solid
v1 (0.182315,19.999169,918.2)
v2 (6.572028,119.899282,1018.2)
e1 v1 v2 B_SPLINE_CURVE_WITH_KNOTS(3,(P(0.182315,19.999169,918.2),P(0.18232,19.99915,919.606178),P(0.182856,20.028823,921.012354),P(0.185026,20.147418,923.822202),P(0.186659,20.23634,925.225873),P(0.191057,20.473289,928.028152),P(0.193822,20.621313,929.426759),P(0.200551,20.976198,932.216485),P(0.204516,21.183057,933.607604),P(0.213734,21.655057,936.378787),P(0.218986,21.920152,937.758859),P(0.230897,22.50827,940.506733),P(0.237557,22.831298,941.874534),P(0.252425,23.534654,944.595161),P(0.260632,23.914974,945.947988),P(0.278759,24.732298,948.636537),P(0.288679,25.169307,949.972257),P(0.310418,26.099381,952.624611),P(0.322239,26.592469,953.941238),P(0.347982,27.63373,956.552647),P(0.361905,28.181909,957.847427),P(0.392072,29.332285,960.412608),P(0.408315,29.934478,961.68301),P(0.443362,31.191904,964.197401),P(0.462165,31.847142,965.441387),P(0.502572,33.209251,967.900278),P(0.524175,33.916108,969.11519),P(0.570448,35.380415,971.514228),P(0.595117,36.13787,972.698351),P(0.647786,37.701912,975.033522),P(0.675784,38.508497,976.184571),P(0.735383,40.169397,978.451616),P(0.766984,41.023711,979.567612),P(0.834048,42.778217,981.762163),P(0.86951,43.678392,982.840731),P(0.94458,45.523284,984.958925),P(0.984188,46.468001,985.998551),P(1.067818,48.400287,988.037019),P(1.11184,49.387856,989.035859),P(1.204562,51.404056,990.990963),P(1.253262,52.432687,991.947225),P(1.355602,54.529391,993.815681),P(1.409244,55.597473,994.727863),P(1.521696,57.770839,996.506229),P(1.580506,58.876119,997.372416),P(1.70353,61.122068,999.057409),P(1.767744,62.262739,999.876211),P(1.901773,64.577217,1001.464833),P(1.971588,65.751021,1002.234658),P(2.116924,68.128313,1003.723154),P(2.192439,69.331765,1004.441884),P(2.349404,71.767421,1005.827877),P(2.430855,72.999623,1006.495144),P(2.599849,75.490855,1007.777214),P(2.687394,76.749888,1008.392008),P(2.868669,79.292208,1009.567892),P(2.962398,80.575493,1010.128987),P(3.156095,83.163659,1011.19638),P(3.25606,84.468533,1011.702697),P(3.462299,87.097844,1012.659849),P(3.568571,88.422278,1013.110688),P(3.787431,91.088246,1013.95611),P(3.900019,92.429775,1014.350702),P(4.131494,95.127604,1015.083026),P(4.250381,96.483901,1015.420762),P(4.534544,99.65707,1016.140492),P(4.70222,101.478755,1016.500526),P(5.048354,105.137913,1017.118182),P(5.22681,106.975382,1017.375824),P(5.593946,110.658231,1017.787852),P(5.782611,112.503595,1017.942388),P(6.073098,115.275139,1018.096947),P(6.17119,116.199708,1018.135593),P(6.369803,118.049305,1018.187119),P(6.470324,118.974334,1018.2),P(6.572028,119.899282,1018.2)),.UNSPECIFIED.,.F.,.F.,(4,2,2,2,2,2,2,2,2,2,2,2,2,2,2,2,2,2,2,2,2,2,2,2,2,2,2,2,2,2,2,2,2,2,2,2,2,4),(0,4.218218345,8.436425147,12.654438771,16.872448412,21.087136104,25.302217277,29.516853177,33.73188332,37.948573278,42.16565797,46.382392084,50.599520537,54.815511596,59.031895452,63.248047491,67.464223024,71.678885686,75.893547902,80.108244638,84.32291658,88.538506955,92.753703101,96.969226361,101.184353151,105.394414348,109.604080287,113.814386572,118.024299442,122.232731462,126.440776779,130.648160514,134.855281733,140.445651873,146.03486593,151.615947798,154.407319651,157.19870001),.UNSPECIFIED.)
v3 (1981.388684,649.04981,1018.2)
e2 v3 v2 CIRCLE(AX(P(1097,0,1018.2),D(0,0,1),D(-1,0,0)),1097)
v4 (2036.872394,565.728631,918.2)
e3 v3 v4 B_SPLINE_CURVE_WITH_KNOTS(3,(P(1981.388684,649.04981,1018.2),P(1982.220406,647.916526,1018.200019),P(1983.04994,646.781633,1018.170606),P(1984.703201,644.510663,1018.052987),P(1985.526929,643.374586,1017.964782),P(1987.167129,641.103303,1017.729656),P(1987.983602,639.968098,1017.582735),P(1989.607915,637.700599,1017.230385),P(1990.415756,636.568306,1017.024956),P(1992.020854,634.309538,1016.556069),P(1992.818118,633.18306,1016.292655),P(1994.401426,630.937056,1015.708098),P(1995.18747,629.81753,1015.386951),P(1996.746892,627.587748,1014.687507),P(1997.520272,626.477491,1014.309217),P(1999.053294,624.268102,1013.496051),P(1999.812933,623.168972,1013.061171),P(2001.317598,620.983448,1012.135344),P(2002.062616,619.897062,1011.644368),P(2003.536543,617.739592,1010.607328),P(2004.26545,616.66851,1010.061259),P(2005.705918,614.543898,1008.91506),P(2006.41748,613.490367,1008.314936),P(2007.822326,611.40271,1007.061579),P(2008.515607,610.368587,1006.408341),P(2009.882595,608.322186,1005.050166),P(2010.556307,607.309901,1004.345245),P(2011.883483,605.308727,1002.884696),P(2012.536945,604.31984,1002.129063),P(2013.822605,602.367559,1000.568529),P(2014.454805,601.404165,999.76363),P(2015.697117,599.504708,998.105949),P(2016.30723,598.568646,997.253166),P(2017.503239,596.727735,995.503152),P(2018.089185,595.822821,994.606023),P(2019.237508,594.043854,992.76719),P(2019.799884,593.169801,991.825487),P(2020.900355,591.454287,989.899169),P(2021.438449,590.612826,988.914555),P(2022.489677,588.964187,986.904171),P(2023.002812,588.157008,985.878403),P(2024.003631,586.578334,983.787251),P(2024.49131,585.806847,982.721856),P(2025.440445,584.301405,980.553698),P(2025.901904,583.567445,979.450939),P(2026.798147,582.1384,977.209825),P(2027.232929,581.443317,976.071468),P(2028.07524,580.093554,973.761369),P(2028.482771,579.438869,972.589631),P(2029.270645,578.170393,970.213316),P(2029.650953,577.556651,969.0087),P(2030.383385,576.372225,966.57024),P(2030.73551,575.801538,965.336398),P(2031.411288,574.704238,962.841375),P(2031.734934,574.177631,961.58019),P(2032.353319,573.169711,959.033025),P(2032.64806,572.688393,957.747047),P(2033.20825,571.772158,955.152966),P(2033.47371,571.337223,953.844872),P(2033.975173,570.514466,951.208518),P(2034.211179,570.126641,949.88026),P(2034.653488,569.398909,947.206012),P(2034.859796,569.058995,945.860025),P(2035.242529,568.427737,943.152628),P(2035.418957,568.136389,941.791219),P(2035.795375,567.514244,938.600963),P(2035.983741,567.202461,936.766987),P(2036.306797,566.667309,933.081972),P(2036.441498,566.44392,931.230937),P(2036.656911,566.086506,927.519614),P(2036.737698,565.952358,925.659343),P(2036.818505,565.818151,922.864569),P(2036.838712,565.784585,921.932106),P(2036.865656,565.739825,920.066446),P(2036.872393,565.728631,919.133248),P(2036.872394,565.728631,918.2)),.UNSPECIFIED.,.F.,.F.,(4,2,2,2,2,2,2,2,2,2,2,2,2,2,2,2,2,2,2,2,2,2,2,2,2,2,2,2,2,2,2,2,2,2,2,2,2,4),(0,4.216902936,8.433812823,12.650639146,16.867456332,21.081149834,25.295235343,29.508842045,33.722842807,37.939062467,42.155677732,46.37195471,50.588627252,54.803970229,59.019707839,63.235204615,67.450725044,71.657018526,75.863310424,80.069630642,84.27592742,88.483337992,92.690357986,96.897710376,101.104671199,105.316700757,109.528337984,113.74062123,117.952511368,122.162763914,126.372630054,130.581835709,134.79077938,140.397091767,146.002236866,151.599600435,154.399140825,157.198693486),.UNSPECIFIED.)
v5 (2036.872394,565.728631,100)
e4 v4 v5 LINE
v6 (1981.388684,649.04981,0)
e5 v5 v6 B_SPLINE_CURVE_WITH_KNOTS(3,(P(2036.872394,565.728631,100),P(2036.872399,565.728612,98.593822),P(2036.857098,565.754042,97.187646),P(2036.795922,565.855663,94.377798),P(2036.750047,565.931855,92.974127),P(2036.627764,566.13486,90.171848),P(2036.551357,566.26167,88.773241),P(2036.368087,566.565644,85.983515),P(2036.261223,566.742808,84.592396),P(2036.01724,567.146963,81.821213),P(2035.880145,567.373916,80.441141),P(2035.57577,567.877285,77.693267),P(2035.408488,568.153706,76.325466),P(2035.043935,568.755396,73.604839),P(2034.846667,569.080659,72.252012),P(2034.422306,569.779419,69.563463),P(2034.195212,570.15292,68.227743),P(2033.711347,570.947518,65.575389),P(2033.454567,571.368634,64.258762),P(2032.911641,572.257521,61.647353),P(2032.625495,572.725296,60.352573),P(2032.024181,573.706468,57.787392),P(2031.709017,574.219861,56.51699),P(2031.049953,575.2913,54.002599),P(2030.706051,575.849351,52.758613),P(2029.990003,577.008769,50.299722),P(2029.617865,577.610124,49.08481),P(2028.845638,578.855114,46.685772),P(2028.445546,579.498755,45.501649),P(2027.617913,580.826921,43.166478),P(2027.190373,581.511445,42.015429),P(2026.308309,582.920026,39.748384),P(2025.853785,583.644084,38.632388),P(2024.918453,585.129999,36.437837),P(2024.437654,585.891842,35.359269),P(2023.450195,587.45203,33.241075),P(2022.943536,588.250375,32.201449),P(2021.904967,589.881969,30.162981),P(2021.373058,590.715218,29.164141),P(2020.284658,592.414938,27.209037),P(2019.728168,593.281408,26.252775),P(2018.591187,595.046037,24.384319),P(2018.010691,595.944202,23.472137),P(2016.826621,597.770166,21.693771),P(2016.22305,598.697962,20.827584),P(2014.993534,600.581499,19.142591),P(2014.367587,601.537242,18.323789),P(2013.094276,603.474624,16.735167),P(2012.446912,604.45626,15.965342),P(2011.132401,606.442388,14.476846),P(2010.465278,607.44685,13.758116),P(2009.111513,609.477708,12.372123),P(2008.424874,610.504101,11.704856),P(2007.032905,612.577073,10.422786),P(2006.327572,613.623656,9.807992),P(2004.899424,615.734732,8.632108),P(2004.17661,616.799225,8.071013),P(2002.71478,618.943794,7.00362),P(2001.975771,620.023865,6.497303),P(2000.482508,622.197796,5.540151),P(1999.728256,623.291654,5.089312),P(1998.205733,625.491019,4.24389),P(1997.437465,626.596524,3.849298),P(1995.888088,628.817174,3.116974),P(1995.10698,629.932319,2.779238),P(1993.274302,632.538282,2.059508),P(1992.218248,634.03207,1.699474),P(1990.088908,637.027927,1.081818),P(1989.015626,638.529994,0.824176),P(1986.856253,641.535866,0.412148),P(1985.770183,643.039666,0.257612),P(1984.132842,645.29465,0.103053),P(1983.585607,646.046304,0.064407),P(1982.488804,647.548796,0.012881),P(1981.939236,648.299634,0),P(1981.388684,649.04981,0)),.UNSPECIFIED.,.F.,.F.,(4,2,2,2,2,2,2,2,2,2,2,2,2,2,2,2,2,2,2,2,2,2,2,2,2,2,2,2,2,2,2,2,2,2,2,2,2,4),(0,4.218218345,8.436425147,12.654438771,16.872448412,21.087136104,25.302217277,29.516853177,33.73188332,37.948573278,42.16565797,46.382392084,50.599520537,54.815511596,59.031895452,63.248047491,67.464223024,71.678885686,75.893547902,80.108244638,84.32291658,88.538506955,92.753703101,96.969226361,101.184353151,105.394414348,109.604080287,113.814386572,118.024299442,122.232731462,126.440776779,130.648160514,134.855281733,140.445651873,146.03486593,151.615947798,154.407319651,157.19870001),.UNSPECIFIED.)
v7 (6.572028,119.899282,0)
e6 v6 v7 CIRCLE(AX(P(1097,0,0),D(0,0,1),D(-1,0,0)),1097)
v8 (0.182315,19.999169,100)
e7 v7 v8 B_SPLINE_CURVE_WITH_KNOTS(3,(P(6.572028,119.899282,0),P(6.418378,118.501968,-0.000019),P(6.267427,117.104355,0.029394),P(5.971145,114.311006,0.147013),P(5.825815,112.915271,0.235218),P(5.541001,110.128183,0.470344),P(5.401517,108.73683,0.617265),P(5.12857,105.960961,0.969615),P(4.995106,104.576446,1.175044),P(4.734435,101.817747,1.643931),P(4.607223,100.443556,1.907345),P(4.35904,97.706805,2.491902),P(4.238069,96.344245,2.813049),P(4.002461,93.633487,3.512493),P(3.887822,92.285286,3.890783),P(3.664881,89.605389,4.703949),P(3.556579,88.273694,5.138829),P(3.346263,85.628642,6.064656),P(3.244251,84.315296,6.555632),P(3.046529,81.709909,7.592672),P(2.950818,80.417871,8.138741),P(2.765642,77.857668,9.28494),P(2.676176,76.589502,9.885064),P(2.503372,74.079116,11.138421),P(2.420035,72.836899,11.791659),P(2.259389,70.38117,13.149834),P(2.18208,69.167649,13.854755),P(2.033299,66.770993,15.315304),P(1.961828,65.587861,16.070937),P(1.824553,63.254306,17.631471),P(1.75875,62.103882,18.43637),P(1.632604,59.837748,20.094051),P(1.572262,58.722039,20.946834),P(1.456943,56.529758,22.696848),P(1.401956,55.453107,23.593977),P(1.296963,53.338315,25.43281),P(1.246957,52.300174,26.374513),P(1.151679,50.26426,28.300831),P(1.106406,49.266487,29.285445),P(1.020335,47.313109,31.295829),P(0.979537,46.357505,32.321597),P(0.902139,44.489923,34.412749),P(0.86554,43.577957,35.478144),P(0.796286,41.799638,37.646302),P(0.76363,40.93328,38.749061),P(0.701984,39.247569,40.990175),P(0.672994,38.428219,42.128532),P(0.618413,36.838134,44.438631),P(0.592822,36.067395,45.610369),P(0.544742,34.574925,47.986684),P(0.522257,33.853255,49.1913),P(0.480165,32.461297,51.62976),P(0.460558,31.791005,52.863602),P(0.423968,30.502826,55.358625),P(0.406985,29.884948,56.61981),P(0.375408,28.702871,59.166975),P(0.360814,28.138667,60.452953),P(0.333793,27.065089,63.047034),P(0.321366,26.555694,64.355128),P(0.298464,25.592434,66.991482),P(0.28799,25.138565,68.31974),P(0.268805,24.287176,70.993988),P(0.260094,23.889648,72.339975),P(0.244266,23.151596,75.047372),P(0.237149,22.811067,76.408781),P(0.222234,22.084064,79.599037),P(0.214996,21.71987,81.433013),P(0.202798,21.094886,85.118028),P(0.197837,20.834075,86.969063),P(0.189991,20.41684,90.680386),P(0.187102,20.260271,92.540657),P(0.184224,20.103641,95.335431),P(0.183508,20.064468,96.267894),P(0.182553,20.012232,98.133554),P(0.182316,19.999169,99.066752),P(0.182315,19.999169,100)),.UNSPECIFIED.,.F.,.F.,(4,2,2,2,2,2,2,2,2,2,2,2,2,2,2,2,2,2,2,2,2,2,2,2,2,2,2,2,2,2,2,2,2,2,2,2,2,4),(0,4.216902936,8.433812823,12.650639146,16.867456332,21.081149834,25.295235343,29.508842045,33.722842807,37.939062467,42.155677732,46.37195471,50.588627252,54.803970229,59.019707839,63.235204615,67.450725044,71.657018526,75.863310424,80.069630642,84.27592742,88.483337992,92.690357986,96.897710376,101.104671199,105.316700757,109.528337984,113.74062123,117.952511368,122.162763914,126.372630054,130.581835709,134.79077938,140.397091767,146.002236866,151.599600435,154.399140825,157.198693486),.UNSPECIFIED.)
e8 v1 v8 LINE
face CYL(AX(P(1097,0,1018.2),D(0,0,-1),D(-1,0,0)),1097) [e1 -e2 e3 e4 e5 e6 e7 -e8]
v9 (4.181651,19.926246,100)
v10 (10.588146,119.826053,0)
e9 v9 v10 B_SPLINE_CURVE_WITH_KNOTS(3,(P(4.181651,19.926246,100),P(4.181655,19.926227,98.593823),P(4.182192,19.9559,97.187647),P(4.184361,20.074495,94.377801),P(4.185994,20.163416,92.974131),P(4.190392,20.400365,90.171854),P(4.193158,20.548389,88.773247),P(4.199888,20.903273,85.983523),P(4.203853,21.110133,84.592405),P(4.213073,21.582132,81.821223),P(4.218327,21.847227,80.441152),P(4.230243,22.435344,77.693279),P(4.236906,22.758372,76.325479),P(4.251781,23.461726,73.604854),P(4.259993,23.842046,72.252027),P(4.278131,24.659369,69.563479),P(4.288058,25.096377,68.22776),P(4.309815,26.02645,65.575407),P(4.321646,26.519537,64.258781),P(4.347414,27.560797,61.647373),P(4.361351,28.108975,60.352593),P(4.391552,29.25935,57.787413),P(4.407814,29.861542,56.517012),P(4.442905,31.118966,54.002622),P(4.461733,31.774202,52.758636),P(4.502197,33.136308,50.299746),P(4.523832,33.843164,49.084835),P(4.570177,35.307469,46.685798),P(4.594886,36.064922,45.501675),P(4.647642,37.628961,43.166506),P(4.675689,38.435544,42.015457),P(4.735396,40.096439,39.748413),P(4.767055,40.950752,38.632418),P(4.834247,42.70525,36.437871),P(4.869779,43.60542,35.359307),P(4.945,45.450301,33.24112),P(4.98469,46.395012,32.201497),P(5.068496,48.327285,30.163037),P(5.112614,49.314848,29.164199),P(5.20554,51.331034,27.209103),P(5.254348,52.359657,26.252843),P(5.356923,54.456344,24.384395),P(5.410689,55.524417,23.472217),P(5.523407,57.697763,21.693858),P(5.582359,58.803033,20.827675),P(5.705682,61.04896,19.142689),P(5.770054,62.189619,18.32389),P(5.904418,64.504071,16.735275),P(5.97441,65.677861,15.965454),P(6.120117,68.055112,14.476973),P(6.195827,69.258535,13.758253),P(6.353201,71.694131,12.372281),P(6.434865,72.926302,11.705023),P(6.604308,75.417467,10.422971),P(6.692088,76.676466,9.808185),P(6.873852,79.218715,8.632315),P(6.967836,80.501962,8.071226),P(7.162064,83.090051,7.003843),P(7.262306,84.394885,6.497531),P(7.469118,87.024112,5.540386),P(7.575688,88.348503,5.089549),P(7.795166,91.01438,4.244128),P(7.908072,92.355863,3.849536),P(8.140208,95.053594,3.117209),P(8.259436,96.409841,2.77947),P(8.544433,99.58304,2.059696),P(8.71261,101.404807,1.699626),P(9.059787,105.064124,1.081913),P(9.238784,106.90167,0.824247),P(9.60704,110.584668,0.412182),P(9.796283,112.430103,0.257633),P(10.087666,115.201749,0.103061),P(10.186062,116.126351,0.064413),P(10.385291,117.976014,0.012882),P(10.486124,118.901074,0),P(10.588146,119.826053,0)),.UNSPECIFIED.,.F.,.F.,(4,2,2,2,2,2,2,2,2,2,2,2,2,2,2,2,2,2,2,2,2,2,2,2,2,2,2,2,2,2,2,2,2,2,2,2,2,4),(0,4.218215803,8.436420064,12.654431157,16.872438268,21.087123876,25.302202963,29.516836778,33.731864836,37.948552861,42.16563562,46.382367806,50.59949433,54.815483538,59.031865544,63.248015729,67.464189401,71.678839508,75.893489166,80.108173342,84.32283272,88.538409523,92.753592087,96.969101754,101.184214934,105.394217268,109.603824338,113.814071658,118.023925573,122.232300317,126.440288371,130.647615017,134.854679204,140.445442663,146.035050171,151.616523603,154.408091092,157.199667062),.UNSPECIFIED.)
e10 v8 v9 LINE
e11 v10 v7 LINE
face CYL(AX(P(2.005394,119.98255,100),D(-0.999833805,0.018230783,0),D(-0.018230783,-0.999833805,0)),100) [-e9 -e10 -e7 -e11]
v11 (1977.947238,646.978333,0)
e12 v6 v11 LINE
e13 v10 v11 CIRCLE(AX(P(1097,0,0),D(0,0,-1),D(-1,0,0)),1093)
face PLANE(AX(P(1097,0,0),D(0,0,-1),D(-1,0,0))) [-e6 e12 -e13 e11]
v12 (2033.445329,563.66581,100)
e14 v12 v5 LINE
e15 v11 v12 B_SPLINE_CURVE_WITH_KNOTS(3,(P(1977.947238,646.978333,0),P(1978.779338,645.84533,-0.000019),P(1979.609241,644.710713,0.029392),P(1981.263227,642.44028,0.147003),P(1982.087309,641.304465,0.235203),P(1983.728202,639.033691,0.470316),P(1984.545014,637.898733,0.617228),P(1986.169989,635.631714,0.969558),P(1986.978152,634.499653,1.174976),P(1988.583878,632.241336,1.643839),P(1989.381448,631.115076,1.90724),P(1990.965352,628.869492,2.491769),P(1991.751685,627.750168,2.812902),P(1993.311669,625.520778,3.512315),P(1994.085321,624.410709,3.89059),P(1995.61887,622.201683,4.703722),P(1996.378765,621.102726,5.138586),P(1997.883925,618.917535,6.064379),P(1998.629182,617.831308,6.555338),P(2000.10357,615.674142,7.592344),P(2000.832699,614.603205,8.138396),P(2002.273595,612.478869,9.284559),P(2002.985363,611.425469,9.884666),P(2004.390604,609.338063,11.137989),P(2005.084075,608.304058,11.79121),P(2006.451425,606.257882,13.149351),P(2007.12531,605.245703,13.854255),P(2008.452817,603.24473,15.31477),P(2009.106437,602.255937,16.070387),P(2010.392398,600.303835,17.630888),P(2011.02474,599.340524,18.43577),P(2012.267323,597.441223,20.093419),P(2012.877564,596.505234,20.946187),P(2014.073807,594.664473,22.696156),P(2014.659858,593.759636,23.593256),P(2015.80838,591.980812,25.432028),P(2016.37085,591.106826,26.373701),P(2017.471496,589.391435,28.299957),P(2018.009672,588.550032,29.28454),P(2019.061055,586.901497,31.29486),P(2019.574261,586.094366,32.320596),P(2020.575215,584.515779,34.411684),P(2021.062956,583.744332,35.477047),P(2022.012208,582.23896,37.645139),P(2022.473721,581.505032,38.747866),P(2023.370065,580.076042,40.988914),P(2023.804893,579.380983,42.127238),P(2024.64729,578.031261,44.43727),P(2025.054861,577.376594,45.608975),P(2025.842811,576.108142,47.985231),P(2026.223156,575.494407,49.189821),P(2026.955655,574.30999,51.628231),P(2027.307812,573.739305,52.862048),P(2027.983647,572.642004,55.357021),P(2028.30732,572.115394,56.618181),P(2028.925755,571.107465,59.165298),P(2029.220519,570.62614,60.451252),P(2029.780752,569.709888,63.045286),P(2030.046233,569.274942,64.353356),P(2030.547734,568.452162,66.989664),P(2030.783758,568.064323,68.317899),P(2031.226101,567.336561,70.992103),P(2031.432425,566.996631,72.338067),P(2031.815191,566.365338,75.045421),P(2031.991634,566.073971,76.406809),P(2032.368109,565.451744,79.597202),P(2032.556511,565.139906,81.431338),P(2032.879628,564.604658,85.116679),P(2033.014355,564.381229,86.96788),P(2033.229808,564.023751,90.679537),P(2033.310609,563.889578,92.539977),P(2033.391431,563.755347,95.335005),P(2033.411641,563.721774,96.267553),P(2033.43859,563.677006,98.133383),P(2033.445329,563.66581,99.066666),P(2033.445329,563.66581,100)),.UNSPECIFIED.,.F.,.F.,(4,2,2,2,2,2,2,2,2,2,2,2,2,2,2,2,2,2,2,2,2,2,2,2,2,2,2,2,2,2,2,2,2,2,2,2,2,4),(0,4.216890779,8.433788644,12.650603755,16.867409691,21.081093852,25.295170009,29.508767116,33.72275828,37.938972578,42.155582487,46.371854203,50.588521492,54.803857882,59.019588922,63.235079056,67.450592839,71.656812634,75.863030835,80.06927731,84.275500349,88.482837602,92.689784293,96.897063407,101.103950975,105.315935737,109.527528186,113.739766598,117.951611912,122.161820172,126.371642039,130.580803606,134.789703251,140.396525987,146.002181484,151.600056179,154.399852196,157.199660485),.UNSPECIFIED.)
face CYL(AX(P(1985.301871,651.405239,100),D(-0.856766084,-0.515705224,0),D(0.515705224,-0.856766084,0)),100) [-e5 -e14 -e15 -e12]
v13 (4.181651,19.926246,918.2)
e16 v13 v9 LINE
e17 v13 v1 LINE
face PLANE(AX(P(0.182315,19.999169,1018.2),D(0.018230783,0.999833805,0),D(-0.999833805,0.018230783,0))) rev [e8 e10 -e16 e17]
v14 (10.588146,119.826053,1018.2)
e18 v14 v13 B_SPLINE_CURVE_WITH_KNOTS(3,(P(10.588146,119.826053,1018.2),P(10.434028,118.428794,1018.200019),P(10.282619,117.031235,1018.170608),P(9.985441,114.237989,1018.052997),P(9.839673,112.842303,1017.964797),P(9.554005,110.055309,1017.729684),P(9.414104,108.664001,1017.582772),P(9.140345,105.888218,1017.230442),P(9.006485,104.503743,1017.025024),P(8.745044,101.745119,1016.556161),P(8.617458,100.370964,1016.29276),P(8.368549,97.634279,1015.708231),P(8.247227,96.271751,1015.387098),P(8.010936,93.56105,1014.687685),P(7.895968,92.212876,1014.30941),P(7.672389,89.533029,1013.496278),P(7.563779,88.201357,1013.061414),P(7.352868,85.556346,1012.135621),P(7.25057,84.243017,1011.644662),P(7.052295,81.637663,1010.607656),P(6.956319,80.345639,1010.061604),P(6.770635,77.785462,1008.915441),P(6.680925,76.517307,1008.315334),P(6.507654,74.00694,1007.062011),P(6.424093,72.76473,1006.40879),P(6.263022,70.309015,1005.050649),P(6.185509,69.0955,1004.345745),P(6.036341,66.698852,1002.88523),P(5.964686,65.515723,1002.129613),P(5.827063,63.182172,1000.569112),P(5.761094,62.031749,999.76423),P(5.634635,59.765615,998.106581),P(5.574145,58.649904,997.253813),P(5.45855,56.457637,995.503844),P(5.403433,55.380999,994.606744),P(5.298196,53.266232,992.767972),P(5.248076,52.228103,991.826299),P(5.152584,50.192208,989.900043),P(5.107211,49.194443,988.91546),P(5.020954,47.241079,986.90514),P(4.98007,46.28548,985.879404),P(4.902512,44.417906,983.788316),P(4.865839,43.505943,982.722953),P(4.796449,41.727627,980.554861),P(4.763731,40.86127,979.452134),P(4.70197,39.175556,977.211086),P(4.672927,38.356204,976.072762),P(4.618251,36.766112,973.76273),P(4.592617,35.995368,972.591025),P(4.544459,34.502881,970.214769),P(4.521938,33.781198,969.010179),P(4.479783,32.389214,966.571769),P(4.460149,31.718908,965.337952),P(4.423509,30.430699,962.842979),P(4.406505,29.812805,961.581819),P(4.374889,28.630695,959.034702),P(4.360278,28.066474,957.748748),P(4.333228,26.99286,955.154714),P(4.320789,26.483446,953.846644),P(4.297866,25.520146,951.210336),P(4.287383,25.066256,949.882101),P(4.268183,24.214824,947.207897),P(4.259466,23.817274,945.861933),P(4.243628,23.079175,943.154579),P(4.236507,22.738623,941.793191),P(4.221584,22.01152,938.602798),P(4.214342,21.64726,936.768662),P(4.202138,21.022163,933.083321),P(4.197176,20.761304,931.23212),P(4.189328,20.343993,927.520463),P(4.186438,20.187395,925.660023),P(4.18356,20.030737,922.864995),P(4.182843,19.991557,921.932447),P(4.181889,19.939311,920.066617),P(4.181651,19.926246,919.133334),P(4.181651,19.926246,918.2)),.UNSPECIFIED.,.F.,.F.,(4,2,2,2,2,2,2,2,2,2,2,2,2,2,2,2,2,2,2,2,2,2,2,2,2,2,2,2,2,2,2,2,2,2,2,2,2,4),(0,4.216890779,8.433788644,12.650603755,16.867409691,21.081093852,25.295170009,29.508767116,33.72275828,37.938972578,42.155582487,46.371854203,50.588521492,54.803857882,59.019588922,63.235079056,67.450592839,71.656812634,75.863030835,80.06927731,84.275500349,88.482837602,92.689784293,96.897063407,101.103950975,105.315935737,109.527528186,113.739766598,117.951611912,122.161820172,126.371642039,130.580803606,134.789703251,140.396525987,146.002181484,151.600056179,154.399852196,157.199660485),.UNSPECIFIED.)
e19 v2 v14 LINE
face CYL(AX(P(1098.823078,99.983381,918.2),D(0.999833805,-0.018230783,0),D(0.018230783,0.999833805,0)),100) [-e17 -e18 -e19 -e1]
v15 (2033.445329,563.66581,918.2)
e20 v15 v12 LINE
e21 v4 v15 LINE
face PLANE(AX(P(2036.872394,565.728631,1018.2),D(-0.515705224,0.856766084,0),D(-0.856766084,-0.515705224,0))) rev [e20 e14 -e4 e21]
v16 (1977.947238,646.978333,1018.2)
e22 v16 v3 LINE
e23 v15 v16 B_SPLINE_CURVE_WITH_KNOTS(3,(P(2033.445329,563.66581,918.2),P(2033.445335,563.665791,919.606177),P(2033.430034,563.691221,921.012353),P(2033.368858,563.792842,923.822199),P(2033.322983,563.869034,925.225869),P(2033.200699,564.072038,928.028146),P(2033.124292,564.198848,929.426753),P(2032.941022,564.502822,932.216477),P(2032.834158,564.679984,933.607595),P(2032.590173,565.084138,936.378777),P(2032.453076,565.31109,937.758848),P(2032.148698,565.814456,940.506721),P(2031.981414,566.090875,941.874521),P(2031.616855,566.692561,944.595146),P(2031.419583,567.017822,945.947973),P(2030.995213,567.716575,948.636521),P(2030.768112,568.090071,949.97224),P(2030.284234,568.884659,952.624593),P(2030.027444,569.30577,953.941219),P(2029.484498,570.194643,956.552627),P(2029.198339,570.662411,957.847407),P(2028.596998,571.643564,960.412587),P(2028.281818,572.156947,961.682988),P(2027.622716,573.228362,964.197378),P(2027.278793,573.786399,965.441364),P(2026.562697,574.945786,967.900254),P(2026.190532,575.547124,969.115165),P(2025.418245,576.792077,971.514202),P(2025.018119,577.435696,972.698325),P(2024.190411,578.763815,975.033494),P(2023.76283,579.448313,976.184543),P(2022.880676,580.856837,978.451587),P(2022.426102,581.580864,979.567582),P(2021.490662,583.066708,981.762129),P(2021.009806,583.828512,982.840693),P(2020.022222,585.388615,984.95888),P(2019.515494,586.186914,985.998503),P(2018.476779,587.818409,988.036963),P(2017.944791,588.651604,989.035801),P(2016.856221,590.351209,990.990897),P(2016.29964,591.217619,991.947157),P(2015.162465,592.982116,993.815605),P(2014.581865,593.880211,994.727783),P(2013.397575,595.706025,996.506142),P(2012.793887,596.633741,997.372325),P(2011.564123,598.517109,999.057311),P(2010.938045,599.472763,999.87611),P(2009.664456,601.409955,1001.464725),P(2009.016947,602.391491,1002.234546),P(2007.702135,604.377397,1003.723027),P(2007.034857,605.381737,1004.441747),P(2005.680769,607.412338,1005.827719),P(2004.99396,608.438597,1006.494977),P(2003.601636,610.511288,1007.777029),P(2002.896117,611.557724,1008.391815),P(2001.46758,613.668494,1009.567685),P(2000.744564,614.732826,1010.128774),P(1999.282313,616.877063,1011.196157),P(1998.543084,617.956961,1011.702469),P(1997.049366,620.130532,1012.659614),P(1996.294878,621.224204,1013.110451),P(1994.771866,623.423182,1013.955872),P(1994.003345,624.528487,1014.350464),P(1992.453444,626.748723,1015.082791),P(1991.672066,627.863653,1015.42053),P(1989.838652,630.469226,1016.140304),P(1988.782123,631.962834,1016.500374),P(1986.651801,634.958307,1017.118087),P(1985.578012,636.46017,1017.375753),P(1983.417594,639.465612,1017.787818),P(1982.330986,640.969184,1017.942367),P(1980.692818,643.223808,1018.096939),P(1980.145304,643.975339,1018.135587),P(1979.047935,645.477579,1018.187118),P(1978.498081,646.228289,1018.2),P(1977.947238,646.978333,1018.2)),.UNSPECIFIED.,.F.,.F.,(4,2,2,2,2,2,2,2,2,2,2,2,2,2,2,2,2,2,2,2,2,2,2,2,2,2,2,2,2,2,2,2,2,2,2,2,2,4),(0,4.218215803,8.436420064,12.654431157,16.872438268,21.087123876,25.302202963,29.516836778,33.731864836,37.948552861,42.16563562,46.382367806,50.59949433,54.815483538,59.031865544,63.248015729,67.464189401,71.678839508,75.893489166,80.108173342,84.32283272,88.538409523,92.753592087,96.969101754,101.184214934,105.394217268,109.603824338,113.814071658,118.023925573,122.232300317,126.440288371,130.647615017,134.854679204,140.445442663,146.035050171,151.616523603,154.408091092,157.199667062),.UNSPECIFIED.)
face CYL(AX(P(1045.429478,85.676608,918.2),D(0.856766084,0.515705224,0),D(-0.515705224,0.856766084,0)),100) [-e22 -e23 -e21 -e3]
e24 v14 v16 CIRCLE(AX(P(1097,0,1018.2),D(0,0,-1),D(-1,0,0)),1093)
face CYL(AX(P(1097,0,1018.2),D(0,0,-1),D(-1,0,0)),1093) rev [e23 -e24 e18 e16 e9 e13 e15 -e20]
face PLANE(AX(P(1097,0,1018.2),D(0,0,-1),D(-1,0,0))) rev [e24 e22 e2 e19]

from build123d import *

# Parameters (mm, degrees)
BOSS_EXTRUDE1_DEPTH = 1018.2
FILLET1_START       = -1
FILLET1_DEPTH       = 10
FILLET1_START_2     = 2027
FILLET1_2_DEPTH     = 11


with BuildPart() as part:
    # Sketch1 → Boss-Extrude1 (new body)
    with BuildSketch(Plane.XY):
        with BuildLine():
            Line((2036.872393674, 565.728630714), (2033.445329339, 563.665809819))
            ThreePointArc((2033.445329339, 563.665809819), (814.110783703, 1055.756928134), (4.181650628, 19.926245878))
            Line((4.181650628, 19.926245878), (0.182315406, 19.99916901))
            ThreePointArc((0.182315406, 19.99916901), (813.075507523, 1059.620631439), (2036.872393674, 565.728630714))
        make_face()
    extrude(amount=BOSS_EXTRUDE1_DEPTH)

    # Fillet1: read off the stored shape, not the designer's step
    # Fillet1 outline → Fillet1 (cut)
    with BuildSketch(Plane(origin=(0, 0, 0), x_dir=(0.018230783053814693, 0.9998338054643106, 0), z_dir=(0.9998338054643106, -0.018230783053814693, 0)).offset(FILLET1_START)):
        with BuildLine():
            ThreePointArc((119.99916901, 0), (49.288490891, 29.289321881), (19.99916901, 100))
            Line((19.99916901, 100), (19.99916901, 0))
            Line((19.99916901, 0), (119.99916901, 0))
        make_face()
        with BuildLine():
            ThreePointArc((19.99916901, 918.2), (49.288490891, 988.910678119), (119.99916901, 1018.2))
            Line((119.99916901, 1018.2), (19.99916901, 1018.2))
            Line((19.99916901, 1018.2), (19.99916901, 918.2))
        make_face()
    extrude(amount=FILLET1_DEPTH, mode=Mode.SUBTRACT)

    # Fillet1 2 outline → Fillet1 2 (cut)
    with BuildSketch(Plane(origin=(0, 0, 0), x_dir=(0.5157052239876767, -0.8567660835676328, 0), z_dir=(0.8567660835676328, 0.515705223987677, 0)).offset(FILLET1_START_2)):
        with BuildLine():
            Line((565.728630715, 0), (465.728630715, 0))
            ThreePointArc((465.728630715, 0), (536.439308834, -29.289321881), (565.728630715, -100))
            Line((565.728630715, -100), (565.728630715, 0))
        make_face()
        with BuildLine():
            Line((565.728630715, -1018.2), (565.728630715, -918.2))
            ThreePointArc((565.728630715, -918.2), (536.439308834, -988.910678119), (465.728630715, -1018.2))
            Line((465.728630715, -1018.2), (565.728630715, -1018.2))
        make_face()
    extrude(amount=FILLET1_2_DEPTH, mode=Mode.SUBTRACT)


solid = part.part
